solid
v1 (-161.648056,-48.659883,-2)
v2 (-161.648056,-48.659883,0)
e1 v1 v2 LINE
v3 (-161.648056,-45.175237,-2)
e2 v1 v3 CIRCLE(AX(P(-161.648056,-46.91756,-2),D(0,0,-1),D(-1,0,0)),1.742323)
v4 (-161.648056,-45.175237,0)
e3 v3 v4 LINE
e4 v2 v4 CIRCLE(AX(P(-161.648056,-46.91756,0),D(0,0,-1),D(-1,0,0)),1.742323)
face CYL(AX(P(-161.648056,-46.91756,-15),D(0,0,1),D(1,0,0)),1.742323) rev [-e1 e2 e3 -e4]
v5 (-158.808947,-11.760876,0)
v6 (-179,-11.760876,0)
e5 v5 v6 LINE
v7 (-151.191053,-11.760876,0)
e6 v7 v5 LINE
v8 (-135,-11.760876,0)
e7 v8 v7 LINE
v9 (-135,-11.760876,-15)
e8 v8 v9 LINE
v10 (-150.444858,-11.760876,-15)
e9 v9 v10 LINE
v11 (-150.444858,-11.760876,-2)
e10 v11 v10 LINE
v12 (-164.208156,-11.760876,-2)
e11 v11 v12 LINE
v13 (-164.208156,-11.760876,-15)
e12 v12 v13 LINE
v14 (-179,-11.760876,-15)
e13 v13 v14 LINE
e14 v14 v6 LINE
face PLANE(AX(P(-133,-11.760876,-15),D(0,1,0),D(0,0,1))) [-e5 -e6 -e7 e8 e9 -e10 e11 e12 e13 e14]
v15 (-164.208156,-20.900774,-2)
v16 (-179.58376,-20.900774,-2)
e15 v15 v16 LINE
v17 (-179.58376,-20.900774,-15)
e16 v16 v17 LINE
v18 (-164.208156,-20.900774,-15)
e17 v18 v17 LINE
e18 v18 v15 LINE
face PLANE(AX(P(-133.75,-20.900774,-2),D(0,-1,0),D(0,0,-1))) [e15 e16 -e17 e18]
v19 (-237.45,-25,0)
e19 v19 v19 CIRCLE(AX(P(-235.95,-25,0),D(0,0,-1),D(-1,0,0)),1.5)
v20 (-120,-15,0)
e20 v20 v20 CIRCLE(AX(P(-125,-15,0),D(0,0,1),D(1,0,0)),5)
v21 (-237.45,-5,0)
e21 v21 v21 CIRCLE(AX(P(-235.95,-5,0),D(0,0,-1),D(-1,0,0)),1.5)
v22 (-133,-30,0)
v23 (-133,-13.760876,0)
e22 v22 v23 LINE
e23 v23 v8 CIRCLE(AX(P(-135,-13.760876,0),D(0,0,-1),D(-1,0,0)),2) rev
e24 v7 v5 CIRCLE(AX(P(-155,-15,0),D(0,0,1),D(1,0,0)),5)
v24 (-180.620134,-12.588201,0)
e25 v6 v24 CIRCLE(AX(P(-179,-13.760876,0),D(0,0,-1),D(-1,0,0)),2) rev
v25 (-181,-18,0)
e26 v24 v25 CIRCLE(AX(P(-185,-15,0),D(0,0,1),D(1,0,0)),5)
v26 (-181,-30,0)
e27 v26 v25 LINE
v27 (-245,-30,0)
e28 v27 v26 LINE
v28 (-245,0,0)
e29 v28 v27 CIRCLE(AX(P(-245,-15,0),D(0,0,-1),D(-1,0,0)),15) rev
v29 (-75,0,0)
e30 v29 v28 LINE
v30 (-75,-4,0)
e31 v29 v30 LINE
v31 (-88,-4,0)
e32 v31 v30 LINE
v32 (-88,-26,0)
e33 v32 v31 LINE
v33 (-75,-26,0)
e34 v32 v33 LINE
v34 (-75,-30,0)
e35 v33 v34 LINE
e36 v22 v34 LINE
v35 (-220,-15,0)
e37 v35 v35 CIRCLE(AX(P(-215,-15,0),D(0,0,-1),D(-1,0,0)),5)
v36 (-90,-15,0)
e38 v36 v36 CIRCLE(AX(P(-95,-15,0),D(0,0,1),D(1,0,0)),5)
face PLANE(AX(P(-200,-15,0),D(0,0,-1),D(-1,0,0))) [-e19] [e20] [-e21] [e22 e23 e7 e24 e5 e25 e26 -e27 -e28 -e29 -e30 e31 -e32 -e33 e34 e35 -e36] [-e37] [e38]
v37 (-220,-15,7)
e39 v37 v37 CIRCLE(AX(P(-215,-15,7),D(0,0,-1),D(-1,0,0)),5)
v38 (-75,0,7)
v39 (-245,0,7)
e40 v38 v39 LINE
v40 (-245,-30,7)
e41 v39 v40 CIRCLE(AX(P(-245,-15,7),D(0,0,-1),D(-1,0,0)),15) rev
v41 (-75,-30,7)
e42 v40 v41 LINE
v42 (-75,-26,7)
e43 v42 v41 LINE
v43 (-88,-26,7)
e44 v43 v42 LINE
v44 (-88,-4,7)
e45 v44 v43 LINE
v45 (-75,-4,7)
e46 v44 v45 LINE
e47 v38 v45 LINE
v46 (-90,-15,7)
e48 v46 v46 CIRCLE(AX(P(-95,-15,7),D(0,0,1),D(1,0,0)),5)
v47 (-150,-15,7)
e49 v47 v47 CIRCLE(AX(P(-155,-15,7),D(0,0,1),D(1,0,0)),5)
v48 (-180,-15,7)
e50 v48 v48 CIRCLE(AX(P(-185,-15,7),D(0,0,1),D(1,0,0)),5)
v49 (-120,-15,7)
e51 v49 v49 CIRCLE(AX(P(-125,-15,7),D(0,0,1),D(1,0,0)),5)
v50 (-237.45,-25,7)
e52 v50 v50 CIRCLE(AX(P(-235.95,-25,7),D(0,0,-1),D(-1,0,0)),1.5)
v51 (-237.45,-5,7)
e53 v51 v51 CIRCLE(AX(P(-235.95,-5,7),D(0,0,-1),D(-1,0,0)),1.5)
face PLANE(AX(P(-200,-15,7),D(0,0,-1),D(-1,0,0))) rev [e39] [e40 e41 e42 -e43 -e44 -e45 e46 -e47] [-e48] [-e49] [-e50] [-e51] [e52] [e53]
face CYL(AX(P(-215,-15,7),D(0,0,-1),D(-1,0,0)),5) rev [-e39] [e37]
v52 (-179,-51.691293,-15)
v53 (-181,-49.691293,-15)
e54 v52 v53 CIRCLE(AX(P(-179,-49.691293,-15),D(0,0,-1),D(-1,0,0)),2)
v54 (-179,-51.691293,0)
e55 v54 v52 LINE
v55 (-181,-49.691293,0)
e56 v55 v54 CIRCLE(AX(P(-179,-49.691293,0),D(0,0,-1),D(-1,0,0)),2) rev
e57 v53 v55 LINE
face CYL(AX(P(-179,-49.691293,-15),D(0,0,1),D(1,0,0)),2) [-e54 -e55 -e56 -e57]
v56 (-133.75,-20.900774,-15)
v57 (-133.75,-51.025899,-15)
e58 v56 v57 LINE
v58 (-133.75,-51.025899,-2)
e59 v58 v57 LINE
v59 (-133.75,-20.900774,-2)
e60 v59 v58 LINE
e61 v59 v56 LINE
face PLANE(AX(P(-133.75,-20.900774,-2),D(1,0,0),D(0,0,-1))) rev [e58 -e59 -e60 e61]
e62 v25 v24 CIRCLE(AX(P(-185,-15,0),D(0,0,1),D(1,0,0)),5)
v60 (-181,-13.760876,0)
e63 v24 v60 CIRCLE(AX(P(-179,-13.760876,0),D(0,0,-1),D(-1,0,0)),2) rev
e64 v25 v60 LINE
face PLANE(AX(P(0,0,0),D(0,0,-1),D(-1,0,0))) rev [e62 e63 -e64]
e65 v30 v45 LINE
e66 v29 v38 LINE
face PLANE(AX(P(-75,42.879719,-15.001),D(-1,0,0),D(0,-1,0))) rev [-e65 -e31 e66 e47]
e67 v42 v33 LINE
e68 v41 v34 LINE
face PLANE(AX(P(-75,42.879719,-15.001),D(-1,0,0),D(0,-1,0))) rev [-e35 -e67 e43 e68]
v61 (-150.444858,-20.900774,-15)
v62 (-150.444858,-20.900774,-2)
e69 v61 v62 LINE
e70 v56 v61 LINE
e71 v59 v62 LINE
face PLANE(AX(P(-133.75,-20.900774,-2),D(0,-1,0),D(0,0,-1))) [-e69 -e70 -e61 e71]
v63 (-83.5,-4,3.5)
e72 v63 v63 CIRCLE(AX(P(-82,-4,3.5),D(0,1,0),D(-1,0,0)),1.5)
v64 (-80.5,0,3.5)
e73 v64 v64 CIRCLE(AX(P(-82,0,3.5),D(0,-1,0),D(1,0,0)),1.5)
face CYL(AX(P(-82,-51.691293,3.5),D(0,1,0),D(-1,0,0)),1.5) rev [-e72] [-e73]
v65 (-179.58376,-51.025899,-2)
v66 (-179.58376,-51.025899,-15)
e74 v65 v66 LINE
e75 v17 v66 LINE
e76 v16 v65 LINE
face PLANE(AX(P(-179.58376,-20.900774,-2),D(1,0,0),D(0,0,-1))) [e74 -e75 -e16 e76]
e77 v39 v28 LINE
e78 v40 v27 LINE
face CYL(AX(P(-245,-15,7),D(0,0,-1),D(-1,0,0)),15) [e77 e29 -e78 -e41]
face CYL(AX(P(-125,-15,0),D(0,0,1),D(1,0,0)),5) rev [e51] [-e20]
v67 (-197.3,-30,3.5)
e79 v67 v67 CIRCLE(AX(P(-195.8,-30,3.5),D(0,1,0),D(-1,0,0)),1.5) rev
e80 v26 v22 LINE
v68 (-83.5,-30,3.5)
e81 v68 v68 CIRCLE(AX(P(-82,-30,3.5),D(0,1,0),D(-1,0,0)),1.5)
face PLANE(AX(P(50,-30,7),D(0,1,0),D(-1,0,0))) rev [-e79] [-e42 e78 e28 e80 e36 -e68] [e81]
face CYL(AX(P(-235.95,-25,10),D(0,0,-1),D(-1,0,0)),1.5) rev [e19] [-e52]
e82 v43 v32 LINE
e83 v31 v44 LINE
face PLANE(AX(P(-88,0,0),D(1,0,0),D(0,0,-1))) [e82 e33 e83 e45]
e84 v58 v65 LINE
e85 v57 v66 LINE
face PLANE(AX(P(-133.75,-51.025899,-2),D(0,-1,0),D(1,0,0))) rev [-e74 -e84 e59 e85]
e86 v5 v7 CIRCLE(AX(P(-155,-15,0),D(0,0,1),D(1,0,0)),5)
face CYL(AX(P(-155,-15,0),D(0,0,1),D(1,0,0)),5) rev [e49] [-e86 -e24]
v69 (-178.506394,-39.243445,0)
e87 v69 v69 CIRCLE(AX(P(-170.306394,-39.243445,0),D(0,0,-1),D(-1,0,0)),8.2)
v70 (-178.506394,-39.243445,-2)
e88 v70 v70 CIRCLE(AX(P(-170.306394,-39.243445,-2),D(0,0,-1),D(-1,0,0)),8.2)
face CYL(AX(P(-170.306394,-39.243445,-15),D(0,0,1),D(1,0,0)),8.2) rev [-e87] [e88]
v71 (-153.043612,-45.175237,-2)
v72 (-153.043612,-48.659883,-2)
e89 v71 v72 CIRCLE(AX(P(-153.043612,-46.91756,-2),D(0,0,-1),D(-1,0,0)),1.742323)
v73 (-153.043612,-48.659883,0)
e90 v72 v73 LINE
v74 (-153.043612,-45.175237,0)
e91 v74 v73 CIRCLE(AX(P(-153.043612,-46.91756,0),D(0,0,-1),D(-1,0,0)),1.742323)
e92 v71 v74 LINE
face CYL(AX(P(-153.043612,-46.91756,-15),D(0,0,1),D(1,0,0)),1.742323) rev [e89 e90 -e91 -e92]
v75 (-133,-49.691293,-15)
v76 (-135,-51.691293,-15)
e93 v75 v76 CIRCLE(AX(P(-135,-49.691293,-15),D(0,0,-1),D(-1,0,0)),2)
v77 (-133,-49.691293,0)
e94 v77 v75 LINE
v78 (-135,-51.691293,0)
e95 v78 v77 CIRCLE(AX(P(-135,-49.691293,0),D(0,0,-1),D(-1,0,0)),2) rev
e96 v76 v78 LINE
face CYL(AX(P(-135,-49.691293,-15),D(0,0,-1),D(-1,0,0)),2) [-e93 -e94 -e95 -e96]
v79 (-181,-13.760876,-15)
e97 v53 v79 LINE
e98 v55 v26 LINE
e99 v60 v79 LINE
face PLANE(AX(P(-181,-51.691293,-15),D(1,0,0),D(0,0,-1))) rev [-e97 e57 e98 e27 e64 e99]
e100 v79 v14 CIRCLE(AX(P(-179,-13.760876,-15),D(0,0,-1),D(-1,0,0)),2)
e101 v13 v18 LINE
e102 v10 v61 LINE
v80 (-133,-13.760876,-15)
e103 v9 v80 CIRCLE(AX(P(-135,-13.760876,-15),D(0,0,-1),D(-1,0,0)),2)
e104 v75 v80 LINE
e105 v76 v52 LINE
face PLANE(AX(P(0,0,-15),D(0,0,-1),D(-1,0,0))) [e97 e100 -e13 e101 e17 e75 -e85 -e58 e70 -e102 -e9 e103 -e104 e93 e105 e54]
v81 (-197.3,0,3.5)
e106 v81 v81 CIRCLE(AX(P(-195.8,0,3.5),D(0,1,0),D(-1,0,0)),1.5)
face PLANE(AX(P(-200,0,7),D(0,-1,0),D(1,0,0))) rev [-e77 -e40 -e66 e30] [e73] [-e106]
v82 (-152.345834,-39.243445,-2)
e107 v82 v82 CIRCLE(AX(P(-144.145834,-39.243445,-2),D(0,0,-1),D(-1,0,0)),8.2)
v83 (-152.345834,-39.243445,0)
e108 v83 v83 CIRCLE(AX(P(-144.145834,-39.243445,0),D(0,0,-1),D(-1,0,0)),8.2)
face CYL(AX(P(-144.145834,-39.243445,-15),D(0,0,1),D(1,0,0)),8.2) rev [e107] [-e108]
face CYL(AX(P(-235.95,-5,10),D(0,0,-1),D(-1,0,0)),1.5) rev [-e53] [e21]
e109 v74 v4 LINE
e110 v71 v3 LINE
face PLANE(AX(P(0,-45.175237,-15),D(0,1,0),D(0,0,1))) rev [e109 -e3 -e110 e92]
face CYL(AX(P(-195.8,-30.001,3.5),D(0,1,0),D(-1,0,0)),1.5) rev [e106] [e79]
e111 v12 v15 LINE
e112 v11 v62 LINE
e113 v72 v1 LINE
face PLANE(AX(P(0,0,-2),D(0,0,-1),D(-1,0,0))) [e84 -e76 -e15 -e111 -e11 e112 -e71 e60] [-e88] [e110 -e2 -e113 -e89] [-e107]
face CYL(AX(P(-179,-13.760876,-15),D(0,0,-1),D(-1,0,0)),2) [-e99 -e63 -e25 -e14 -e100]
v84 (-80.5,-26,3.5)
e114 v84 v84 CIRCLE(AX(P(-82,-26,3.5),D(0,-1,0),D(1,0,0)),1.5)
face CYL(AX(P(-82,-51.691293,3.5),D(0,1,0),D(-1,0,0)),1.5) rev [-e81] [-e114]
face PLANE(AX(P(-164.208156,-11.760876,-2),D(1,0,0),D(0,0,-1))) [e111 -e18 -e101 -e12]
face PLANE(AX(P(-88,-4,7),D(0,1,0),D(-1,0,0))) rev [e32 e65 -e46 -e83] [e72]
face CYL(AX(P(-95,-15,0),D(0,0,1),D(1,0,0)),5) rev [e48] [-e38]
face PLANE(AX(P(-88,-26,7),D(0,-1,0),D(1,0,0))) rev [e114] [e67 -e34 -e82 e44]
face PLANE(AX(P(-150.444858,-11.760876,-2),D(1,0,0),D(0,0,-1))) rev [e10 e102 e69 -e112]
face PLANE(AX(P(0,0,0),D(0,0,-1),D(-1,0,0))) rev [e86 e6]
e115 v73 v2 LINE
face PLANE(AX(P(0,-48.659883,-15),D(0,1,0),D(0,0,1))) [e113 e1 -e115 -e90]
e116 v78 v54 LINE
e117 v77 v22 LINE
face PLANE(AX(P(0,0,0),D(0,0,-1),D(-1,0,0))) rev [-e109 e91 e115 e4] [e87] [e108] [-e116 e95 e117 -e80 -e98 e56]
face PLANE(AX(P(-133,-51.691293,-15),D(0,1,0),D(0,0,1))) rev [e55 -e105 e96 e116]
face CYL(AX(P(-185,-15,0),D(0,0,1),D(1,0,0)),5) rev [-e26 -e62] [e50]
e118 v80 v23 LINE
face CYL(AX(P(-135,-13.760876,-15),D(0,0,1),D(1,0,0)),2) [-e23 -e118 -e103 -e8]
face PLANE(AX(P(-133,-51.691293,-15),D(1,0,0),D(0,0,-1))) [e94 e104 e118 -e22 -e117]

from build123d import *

# Parameters (mm, degrees)
BOSS_EXTRUDE1_DEPTH      = 7
SKETCH2_R                = 5
CUT_EXTRUDE1_DEPTH       = 7
LPATTERN1_COUNT          = 7
LPATTERN1_PITCH          = 30
SKETCH6_R                = 5
CUT_EXTRUDE2_DEPTH       = 10
CUT_EXTRUDE4_REACH       = 219.196
SKETCH9_R                = 1.5
CUT_EXTRUDE9_REACH       = 219.196
SKETCH15_R               = 1.5
SKETCH15_R_2             = 2.5
SKETCH16_W               = 48
SKETCH16_H               = 39.930416712
SKETCH16_R               = 8.2
BOSS_EXTRUDE2_DEPTH      = 15
SKETCH17_W               = 45.833760325
SKETCH17_H               = 30.12512517
SKETCH17_W_2             = 13.763297708
SKETCH17_H_2             = 9.222578979
CUT_EXTRUDE15_DEPTH      = 13
CUT_EXTRUDE16_REACH      = 224.218
SKETCH18_W               = 140
SKETCH18_H               = 115.832892108
FILLET1_R                = 2
BOSS_EXTRUDE4_DEPTH      = 7
CUT_EXTRUDE17_DEPTH      = 10
SKETCH27_W               = 7
SKETCH27_H               = 22
CUT_EXTRUDE18_DEPTH      = 13
CUT_EXTRUDE19_DEPTH      = 266.512692236
CUT_EXTRUDE19_DEPTH_BACK = 266.512692236
SKETCH28_R               = 1.5
CUT_EXTRUDE20_DEPTH      = 266.512692236
CUT_EXTRUDE20_DEPTH_BACK = 266.512692236
SKETCH29_R               = 5


with BuildPart() as part:
    # Sketch1 → Boss-Extrude1 (new body)
    with BuildSketch(Plane.XY):
        with BuildLine():
            Line((-200, 0), (50, 0))
            ThreePointArc((50, 0), (65, -15), (50, -30))
            Line((50, -30), (-200, -30))
            ThreePointArc((-200, -30), (-215, -15), (-200, 0))
        make_face()
    extrude(amount=BOSS_EXTRUDE1_DEPTH)

    # Sketch2 → Cut-Extrude1 (cut)
    with BuildSketch(Plane.XY.offset(7)):
        with Locations((-185, -15)):
            Circle(SKETCH2_R)
    cut_extrude1 = extrude(amount=-CUT_EXTRUDE1_DEPTH, mode=Mode.SUBTRACT)

    # LPattern1: Cut-Extrude1 ×7
    with Locations(*[(i * LPATTERN1_PITCH, 0, 0) for i in range(1, LPATTERN1_COUNT)]):
        add(cut_extrude1, mode=Mode.SUBTRACT)

    # Sketch6 → Cut-Extrude2 (cut)
    with BuildSketch(Plane(origin=(0, 0, 0), x_dir=(-1, 0, 0), z_dir=(0, 0, -1))):
        with Locations((-50, -15)):
            Circle(SKETCH6_R)
    extrude(amount=-CUT_EXTRUDE2_DEPTH, mode=Mode.SUBTRACT)

    # Sketch9 → Cut-Extrude4 (cut, up to next)
    with BuildSketch(Plane(origin=(0, 0, 0), x_dir=(-1, 0, 0), z_dir=(0, 0, -1)), mode=Mode.PRIVATE) as cut_extrude4_sk1:
        with Locations((-29.5, -6.25)):
            Circle(SKETCH9_R)
    cut_extrude4_tool1 = extrude(cut_extrude4_sk1.sketch, amount=-CUT_EXTRUDE4_REACH, mode=Mode.PRIVATE) & part.part
    # Sketch9 → Cut-Extrude4 (cut, up to next)
    with BuildSketch(Plane(origin=(0, 0, 0), x_dir=(-1, 0, 0), z_dir=(0, 0, -1)), mode=Mode.PRIVATE) as cut_extrude4_sk2:
        with Locations((-29.5, -23.75)):
            Circle(SKETCH9_R)
    cut_extrude4_tool2 = extrude(cut_extrude4_sk2.sketch, amount=-CUT_EXTRUDE4_REACH, mode=Mode.PRIVATE) & part.part
    add(cut_extrude4_tool1.solids().sort_by_distance((29.5, -6.25, 0))[0], mode=Mode.SUBTRACT)
    add(cut_extrude4_tool2.solids().sort_by_distance((29.5, -23.75, 0))[0], mode=Mode.SUBTRACT)

    # Sketch15 → Cut-Extrude9 (cut, up to next)
    with BuildSketch(Plane(origin=(0, 0, 0), x_dir=(1, 0, 0), z_dir=(0, 1, 0)), mode=Mode.PRIVATE) as cut_extrude9_sk1:
        with Locations(Location((-195.8, -3.5, 0), (0, 0, 180))):
            Circle(SKETCH15_R)
    cut_extrude9_tool1 = extrude(cut_extrude9_sk1.sketch, amount=-CUT_EXTRUDE9_REACH, mode=Mode.PRIVATE) & part.part
    # Sketch15 → Cut-Extrude9 (cut, up to next)
    with BuildSketch(Plane(origin=(0, 0, 0), x_dir=(1, 0, 0), z_dir=(0, 1, 0)), mode=Mode.PRIVATE) as cut_extrude9_sk2:
        with Locations(Location((45.8, -3.5, 0), (0, 0, 180))):
            Circle(SKETCH15_R_2)
    cut_extrude9_tool2 = extrude(cut_extrude9_sk2.sketch, amount=-CUT_EXTRUDE9_REACH, mode=Mode.PRIVATE) & part.part
    add(cut_extrude9_tool1.solids().sort_by_distance((-195.8, 0, 3.5))[0], mode=Mode.SUBTRACT)
    add(cut_extrude9_tool2.solids().sort_by_distance((45.8, 0, 3.5))[0], mode=Mode.SUBTRACT)

    # Sketch16 → Boss-Extrude2 (add)
    with BuildSketch(Plane(origin=(0, 0, 0), x_dir=(-1, 0, 0), z_dir=(0, 0, -1))):
        with Locations((157, -31.726084321)):
            Rectangle(SKETCH16_W, SKETCH16_H)
        with Locations((144.145834, -39.243444981)):
            Circle(SKETCH16_R, mode=Mode.SUBTRACT)
        with Locations((170.306394211, -39.243444981)):
            Circle(SKETCH16_R, mode=Mode.SUBTRACT)
        with BuildLine():
            Line((153.043612384, -45.175236858), (161.648055614, -45.175236858))
            ThreePointArc((161.648055614, -45.175236858), (163.390378659, -46.917559902), (161.648055614, -48.659882947))
            Line((161.648055614, -48.659882947), (153.043612384, -48.659882947))
            ThreePointArc((153.043612384, -48.659882947), (151.301289339, -46.917559902), (153.043612384, -45.175236858))
        make_face(mode=Mode.SUBTRACT)
    extrude(amount=BOSS_EXTRUDE2_DEPTH)

    # Sketch17 → Cut-Extrude15 (cut)
    with BuildSketch(Plane(origin=(0, 0, -15), x_dir=(-1, 0, 0), z_dir=(0, 0, -1))):
        with Locations((156.666880163, -35.963336462)):
            Rectangle(SKETCH17_W, SKETCH17_H)
        with Locations((157.326506844, -16.372165454)):
            Rectangle(SKETCH17_W_2, SKETCH17_H_2)
    extrude(amount=-CUT_EXTRUDE15_DEPTH, mode=Mode.SUBTRACT)

    # Sketch18 → Cut-Extrude16 (cut, up to next)
    with BuildSketch(Plane.XY.offset(7), mode=Mode.PRIVATE) as cut_extrude16_sk1:
        with Locations((-5, -15.036727437)):
            Rectangle(SKETCH18_W, SKETCH18_H)
    cut_extrude16_tool1 = extrude(cut_extrude16_sk1.sketch, amount=-CUT_EXTRUDE16_REACH, mode=Mode.PRIVATE) & part.part
    add(cut_extrude16_tool1.solids().sort_by_distance((-5, -15.036727, 7))[0], mode=Mode.SUBTRACT)

    # Fillet1
    # the kernel refuses this fillet: 2 mm, written as the material it takes off along each edge
    with BuildSketch(Plane(origin=(-133, -51.691292677, 5), x_dir=(0, 1, 0), z_dir=(0, 0, -1))) as fillet1_piece_1:
        with BuildLine():
            CenterArc((FILLET1_R, -FILLET1_R), FILLET1_R, 90, 90)
            Line((0, -FILLET1_R), (0, 0))
            Line((0, 0), (FILLET1_R, 0))
        make_face()
    extrude(amount=25, mode=Mode.SUBTRACT)
    with BuildSketch(Plane(origin=(-181, -51.691292677, 5), x_dir=(0, 1, 0), z_dir=(0, 0, -1))) as fillet1_piece_2:
        with BuildLine():
            CenterArc((FILLET1_R, FILLET1_R), FILLET1_R, 180, 90)
            Line((0, FILLET1_R), (0, 0))
            Line((0, 0), (FILLET1_R, 0))
        make_face()
    extrude(amount=25, mode=Mode.SUBTRACT)
    with BuildSketch(Plane(origin=(-181, -11.760875965, 0), x_dir=(0, -1, 0), z_dir=(0, 0, -1)), Plane(origin=(-133, -11.760875965, 0), x_dir=(-1, 0, 0), z_dir=(0, 0, -1))) as fillet1_piece_3:
        with BuildLine():
            CenterArc((FILLET1_R, -FILLET1_R), FILLET1_R, 90, 90)
            Line((0, -FILLET1_R), (0, 0))
            Line((0, 0), (FILLET1_R, 0))
        make_face()
    extrude(amount=20, mode=Mode.SUBTRACT)

    # Sketch24 → Boss-Extrude4 (add)
    with BuildSketch(Plane(origin=(0, 0, 0), x_dir=(-1, 0, 0), z_dir=(0, 0, -1))):
        with BuildLine():
            ThreePointArc((245, 0), (260, -15), (245, -30))
            Line((245, -30), (245, 0))
        make_face()
        with BuildLine():
            Line((245, 0), (245, -30))
            Line((245, -30), (200, -30))
            ThreePointArc((200, -30), (215, -15), (200, 0))
            Line((200, 0), (245, 0))
        make_face()
    extrude(amount=-BOSS_EXTRUDE4_DEPTH)

    # Sketch25 → Cut-Extrude17 (cut)
    with BuildSketch(Plane(origin=(0, 0, 0), x_dir=(-1, 0, 0), z_dir=(0, 0, -1))):
        with BuildLine():
            ThreePointArc((237.45, -25), (237.010660172, -23.939339828), (235.95, -23.5))
            Line((235.95, -23.5), (235.95, -26.5))
            ThreePointArc((235.95, -26.5), (237.010660172, -26.060660172), (237.45, -25))
        make_face()
        with BuildLine():
            Line((235.95, -26.5), (235.95, -23.5))
            ThreePointArc((235.95, -23.5), (234.45, -25), (235.95, -26.5))
        make_face()
        with BuildLine():
            ThreePointArc((237.45, -5), (237.010660172, -3.939339828), (235.95, -3.5))
            Line((235.95, -3.5), (235.95, -6.5))
            ThreePointArc((235.95, -6.5), (237.010660172, -6.060660172), (237.45, -5))
        make_face()
        with BuildLine():
            Line((235.95, -6.5), (235.95, -3.5))
            ThreePointArc((235.95, -3.5), (234.45, -5), (235.95, -6.5))
        make_face()
    extrude(amount=-CUT_EXTRUDE17_DEPTH, mode=Mode.SUBTRACT)

    # Sketch27 → Cut-Extrude18 (cut)
    with BuildSketch(Plane(origin=(-75, 0, 0), x_dir=(0, 0, -1), z_dir=(1, 0, 0))):
        with Locations((-3.5, -15)):
            Rectangle(SKETCH27_W, SKETCH27_H)
    extrude(amount=-CUT_EXTRUDE18_DEPTH, mode=Mode.SUBTRACT)

    # Sketch28 → Cut-Extrude19 (cut, two sides: drawn at the far end of the back side and taken through both)
    with BuildSketch(Plane(origin=(0, 0, 0), x_dir=(1, 0, 0), z_dir=(0, 1, 0)).offset(-CUT_EXTRUDE19_DEPTH_BACK)):
        with Locations(Location((-82, -3.5, 0), (0, 0, 180))):
            Circle(SKETCH28_R)
    extrude(amount=CUT_EXTRUDE19_DEPTH + CUT_EXTRUDE19_DEPTH_BACK, mode=Mode.SUBTRACT)

    # Sketch29 → Cut-Extrude20 (cut, two sides: drawn at the far end of the back side and taken through both)
    with BuildSketch(Plane(origin=(0, 0, 0), x_dir=(-1, 0, 0), z_dir=(0, 0, -1)).offset(-CUT_EXTRUDE20_DEPTH_BACK)):
        with Locations((215, -15)):
            Circle(SKETCH29_R)
    extrude(amount=CUT_EXTRUDE20_DEPTH + CUT_EXTRUDE20_DEPTH_BACK, mode=Mode.SUBTRACT)


solid = part.part
